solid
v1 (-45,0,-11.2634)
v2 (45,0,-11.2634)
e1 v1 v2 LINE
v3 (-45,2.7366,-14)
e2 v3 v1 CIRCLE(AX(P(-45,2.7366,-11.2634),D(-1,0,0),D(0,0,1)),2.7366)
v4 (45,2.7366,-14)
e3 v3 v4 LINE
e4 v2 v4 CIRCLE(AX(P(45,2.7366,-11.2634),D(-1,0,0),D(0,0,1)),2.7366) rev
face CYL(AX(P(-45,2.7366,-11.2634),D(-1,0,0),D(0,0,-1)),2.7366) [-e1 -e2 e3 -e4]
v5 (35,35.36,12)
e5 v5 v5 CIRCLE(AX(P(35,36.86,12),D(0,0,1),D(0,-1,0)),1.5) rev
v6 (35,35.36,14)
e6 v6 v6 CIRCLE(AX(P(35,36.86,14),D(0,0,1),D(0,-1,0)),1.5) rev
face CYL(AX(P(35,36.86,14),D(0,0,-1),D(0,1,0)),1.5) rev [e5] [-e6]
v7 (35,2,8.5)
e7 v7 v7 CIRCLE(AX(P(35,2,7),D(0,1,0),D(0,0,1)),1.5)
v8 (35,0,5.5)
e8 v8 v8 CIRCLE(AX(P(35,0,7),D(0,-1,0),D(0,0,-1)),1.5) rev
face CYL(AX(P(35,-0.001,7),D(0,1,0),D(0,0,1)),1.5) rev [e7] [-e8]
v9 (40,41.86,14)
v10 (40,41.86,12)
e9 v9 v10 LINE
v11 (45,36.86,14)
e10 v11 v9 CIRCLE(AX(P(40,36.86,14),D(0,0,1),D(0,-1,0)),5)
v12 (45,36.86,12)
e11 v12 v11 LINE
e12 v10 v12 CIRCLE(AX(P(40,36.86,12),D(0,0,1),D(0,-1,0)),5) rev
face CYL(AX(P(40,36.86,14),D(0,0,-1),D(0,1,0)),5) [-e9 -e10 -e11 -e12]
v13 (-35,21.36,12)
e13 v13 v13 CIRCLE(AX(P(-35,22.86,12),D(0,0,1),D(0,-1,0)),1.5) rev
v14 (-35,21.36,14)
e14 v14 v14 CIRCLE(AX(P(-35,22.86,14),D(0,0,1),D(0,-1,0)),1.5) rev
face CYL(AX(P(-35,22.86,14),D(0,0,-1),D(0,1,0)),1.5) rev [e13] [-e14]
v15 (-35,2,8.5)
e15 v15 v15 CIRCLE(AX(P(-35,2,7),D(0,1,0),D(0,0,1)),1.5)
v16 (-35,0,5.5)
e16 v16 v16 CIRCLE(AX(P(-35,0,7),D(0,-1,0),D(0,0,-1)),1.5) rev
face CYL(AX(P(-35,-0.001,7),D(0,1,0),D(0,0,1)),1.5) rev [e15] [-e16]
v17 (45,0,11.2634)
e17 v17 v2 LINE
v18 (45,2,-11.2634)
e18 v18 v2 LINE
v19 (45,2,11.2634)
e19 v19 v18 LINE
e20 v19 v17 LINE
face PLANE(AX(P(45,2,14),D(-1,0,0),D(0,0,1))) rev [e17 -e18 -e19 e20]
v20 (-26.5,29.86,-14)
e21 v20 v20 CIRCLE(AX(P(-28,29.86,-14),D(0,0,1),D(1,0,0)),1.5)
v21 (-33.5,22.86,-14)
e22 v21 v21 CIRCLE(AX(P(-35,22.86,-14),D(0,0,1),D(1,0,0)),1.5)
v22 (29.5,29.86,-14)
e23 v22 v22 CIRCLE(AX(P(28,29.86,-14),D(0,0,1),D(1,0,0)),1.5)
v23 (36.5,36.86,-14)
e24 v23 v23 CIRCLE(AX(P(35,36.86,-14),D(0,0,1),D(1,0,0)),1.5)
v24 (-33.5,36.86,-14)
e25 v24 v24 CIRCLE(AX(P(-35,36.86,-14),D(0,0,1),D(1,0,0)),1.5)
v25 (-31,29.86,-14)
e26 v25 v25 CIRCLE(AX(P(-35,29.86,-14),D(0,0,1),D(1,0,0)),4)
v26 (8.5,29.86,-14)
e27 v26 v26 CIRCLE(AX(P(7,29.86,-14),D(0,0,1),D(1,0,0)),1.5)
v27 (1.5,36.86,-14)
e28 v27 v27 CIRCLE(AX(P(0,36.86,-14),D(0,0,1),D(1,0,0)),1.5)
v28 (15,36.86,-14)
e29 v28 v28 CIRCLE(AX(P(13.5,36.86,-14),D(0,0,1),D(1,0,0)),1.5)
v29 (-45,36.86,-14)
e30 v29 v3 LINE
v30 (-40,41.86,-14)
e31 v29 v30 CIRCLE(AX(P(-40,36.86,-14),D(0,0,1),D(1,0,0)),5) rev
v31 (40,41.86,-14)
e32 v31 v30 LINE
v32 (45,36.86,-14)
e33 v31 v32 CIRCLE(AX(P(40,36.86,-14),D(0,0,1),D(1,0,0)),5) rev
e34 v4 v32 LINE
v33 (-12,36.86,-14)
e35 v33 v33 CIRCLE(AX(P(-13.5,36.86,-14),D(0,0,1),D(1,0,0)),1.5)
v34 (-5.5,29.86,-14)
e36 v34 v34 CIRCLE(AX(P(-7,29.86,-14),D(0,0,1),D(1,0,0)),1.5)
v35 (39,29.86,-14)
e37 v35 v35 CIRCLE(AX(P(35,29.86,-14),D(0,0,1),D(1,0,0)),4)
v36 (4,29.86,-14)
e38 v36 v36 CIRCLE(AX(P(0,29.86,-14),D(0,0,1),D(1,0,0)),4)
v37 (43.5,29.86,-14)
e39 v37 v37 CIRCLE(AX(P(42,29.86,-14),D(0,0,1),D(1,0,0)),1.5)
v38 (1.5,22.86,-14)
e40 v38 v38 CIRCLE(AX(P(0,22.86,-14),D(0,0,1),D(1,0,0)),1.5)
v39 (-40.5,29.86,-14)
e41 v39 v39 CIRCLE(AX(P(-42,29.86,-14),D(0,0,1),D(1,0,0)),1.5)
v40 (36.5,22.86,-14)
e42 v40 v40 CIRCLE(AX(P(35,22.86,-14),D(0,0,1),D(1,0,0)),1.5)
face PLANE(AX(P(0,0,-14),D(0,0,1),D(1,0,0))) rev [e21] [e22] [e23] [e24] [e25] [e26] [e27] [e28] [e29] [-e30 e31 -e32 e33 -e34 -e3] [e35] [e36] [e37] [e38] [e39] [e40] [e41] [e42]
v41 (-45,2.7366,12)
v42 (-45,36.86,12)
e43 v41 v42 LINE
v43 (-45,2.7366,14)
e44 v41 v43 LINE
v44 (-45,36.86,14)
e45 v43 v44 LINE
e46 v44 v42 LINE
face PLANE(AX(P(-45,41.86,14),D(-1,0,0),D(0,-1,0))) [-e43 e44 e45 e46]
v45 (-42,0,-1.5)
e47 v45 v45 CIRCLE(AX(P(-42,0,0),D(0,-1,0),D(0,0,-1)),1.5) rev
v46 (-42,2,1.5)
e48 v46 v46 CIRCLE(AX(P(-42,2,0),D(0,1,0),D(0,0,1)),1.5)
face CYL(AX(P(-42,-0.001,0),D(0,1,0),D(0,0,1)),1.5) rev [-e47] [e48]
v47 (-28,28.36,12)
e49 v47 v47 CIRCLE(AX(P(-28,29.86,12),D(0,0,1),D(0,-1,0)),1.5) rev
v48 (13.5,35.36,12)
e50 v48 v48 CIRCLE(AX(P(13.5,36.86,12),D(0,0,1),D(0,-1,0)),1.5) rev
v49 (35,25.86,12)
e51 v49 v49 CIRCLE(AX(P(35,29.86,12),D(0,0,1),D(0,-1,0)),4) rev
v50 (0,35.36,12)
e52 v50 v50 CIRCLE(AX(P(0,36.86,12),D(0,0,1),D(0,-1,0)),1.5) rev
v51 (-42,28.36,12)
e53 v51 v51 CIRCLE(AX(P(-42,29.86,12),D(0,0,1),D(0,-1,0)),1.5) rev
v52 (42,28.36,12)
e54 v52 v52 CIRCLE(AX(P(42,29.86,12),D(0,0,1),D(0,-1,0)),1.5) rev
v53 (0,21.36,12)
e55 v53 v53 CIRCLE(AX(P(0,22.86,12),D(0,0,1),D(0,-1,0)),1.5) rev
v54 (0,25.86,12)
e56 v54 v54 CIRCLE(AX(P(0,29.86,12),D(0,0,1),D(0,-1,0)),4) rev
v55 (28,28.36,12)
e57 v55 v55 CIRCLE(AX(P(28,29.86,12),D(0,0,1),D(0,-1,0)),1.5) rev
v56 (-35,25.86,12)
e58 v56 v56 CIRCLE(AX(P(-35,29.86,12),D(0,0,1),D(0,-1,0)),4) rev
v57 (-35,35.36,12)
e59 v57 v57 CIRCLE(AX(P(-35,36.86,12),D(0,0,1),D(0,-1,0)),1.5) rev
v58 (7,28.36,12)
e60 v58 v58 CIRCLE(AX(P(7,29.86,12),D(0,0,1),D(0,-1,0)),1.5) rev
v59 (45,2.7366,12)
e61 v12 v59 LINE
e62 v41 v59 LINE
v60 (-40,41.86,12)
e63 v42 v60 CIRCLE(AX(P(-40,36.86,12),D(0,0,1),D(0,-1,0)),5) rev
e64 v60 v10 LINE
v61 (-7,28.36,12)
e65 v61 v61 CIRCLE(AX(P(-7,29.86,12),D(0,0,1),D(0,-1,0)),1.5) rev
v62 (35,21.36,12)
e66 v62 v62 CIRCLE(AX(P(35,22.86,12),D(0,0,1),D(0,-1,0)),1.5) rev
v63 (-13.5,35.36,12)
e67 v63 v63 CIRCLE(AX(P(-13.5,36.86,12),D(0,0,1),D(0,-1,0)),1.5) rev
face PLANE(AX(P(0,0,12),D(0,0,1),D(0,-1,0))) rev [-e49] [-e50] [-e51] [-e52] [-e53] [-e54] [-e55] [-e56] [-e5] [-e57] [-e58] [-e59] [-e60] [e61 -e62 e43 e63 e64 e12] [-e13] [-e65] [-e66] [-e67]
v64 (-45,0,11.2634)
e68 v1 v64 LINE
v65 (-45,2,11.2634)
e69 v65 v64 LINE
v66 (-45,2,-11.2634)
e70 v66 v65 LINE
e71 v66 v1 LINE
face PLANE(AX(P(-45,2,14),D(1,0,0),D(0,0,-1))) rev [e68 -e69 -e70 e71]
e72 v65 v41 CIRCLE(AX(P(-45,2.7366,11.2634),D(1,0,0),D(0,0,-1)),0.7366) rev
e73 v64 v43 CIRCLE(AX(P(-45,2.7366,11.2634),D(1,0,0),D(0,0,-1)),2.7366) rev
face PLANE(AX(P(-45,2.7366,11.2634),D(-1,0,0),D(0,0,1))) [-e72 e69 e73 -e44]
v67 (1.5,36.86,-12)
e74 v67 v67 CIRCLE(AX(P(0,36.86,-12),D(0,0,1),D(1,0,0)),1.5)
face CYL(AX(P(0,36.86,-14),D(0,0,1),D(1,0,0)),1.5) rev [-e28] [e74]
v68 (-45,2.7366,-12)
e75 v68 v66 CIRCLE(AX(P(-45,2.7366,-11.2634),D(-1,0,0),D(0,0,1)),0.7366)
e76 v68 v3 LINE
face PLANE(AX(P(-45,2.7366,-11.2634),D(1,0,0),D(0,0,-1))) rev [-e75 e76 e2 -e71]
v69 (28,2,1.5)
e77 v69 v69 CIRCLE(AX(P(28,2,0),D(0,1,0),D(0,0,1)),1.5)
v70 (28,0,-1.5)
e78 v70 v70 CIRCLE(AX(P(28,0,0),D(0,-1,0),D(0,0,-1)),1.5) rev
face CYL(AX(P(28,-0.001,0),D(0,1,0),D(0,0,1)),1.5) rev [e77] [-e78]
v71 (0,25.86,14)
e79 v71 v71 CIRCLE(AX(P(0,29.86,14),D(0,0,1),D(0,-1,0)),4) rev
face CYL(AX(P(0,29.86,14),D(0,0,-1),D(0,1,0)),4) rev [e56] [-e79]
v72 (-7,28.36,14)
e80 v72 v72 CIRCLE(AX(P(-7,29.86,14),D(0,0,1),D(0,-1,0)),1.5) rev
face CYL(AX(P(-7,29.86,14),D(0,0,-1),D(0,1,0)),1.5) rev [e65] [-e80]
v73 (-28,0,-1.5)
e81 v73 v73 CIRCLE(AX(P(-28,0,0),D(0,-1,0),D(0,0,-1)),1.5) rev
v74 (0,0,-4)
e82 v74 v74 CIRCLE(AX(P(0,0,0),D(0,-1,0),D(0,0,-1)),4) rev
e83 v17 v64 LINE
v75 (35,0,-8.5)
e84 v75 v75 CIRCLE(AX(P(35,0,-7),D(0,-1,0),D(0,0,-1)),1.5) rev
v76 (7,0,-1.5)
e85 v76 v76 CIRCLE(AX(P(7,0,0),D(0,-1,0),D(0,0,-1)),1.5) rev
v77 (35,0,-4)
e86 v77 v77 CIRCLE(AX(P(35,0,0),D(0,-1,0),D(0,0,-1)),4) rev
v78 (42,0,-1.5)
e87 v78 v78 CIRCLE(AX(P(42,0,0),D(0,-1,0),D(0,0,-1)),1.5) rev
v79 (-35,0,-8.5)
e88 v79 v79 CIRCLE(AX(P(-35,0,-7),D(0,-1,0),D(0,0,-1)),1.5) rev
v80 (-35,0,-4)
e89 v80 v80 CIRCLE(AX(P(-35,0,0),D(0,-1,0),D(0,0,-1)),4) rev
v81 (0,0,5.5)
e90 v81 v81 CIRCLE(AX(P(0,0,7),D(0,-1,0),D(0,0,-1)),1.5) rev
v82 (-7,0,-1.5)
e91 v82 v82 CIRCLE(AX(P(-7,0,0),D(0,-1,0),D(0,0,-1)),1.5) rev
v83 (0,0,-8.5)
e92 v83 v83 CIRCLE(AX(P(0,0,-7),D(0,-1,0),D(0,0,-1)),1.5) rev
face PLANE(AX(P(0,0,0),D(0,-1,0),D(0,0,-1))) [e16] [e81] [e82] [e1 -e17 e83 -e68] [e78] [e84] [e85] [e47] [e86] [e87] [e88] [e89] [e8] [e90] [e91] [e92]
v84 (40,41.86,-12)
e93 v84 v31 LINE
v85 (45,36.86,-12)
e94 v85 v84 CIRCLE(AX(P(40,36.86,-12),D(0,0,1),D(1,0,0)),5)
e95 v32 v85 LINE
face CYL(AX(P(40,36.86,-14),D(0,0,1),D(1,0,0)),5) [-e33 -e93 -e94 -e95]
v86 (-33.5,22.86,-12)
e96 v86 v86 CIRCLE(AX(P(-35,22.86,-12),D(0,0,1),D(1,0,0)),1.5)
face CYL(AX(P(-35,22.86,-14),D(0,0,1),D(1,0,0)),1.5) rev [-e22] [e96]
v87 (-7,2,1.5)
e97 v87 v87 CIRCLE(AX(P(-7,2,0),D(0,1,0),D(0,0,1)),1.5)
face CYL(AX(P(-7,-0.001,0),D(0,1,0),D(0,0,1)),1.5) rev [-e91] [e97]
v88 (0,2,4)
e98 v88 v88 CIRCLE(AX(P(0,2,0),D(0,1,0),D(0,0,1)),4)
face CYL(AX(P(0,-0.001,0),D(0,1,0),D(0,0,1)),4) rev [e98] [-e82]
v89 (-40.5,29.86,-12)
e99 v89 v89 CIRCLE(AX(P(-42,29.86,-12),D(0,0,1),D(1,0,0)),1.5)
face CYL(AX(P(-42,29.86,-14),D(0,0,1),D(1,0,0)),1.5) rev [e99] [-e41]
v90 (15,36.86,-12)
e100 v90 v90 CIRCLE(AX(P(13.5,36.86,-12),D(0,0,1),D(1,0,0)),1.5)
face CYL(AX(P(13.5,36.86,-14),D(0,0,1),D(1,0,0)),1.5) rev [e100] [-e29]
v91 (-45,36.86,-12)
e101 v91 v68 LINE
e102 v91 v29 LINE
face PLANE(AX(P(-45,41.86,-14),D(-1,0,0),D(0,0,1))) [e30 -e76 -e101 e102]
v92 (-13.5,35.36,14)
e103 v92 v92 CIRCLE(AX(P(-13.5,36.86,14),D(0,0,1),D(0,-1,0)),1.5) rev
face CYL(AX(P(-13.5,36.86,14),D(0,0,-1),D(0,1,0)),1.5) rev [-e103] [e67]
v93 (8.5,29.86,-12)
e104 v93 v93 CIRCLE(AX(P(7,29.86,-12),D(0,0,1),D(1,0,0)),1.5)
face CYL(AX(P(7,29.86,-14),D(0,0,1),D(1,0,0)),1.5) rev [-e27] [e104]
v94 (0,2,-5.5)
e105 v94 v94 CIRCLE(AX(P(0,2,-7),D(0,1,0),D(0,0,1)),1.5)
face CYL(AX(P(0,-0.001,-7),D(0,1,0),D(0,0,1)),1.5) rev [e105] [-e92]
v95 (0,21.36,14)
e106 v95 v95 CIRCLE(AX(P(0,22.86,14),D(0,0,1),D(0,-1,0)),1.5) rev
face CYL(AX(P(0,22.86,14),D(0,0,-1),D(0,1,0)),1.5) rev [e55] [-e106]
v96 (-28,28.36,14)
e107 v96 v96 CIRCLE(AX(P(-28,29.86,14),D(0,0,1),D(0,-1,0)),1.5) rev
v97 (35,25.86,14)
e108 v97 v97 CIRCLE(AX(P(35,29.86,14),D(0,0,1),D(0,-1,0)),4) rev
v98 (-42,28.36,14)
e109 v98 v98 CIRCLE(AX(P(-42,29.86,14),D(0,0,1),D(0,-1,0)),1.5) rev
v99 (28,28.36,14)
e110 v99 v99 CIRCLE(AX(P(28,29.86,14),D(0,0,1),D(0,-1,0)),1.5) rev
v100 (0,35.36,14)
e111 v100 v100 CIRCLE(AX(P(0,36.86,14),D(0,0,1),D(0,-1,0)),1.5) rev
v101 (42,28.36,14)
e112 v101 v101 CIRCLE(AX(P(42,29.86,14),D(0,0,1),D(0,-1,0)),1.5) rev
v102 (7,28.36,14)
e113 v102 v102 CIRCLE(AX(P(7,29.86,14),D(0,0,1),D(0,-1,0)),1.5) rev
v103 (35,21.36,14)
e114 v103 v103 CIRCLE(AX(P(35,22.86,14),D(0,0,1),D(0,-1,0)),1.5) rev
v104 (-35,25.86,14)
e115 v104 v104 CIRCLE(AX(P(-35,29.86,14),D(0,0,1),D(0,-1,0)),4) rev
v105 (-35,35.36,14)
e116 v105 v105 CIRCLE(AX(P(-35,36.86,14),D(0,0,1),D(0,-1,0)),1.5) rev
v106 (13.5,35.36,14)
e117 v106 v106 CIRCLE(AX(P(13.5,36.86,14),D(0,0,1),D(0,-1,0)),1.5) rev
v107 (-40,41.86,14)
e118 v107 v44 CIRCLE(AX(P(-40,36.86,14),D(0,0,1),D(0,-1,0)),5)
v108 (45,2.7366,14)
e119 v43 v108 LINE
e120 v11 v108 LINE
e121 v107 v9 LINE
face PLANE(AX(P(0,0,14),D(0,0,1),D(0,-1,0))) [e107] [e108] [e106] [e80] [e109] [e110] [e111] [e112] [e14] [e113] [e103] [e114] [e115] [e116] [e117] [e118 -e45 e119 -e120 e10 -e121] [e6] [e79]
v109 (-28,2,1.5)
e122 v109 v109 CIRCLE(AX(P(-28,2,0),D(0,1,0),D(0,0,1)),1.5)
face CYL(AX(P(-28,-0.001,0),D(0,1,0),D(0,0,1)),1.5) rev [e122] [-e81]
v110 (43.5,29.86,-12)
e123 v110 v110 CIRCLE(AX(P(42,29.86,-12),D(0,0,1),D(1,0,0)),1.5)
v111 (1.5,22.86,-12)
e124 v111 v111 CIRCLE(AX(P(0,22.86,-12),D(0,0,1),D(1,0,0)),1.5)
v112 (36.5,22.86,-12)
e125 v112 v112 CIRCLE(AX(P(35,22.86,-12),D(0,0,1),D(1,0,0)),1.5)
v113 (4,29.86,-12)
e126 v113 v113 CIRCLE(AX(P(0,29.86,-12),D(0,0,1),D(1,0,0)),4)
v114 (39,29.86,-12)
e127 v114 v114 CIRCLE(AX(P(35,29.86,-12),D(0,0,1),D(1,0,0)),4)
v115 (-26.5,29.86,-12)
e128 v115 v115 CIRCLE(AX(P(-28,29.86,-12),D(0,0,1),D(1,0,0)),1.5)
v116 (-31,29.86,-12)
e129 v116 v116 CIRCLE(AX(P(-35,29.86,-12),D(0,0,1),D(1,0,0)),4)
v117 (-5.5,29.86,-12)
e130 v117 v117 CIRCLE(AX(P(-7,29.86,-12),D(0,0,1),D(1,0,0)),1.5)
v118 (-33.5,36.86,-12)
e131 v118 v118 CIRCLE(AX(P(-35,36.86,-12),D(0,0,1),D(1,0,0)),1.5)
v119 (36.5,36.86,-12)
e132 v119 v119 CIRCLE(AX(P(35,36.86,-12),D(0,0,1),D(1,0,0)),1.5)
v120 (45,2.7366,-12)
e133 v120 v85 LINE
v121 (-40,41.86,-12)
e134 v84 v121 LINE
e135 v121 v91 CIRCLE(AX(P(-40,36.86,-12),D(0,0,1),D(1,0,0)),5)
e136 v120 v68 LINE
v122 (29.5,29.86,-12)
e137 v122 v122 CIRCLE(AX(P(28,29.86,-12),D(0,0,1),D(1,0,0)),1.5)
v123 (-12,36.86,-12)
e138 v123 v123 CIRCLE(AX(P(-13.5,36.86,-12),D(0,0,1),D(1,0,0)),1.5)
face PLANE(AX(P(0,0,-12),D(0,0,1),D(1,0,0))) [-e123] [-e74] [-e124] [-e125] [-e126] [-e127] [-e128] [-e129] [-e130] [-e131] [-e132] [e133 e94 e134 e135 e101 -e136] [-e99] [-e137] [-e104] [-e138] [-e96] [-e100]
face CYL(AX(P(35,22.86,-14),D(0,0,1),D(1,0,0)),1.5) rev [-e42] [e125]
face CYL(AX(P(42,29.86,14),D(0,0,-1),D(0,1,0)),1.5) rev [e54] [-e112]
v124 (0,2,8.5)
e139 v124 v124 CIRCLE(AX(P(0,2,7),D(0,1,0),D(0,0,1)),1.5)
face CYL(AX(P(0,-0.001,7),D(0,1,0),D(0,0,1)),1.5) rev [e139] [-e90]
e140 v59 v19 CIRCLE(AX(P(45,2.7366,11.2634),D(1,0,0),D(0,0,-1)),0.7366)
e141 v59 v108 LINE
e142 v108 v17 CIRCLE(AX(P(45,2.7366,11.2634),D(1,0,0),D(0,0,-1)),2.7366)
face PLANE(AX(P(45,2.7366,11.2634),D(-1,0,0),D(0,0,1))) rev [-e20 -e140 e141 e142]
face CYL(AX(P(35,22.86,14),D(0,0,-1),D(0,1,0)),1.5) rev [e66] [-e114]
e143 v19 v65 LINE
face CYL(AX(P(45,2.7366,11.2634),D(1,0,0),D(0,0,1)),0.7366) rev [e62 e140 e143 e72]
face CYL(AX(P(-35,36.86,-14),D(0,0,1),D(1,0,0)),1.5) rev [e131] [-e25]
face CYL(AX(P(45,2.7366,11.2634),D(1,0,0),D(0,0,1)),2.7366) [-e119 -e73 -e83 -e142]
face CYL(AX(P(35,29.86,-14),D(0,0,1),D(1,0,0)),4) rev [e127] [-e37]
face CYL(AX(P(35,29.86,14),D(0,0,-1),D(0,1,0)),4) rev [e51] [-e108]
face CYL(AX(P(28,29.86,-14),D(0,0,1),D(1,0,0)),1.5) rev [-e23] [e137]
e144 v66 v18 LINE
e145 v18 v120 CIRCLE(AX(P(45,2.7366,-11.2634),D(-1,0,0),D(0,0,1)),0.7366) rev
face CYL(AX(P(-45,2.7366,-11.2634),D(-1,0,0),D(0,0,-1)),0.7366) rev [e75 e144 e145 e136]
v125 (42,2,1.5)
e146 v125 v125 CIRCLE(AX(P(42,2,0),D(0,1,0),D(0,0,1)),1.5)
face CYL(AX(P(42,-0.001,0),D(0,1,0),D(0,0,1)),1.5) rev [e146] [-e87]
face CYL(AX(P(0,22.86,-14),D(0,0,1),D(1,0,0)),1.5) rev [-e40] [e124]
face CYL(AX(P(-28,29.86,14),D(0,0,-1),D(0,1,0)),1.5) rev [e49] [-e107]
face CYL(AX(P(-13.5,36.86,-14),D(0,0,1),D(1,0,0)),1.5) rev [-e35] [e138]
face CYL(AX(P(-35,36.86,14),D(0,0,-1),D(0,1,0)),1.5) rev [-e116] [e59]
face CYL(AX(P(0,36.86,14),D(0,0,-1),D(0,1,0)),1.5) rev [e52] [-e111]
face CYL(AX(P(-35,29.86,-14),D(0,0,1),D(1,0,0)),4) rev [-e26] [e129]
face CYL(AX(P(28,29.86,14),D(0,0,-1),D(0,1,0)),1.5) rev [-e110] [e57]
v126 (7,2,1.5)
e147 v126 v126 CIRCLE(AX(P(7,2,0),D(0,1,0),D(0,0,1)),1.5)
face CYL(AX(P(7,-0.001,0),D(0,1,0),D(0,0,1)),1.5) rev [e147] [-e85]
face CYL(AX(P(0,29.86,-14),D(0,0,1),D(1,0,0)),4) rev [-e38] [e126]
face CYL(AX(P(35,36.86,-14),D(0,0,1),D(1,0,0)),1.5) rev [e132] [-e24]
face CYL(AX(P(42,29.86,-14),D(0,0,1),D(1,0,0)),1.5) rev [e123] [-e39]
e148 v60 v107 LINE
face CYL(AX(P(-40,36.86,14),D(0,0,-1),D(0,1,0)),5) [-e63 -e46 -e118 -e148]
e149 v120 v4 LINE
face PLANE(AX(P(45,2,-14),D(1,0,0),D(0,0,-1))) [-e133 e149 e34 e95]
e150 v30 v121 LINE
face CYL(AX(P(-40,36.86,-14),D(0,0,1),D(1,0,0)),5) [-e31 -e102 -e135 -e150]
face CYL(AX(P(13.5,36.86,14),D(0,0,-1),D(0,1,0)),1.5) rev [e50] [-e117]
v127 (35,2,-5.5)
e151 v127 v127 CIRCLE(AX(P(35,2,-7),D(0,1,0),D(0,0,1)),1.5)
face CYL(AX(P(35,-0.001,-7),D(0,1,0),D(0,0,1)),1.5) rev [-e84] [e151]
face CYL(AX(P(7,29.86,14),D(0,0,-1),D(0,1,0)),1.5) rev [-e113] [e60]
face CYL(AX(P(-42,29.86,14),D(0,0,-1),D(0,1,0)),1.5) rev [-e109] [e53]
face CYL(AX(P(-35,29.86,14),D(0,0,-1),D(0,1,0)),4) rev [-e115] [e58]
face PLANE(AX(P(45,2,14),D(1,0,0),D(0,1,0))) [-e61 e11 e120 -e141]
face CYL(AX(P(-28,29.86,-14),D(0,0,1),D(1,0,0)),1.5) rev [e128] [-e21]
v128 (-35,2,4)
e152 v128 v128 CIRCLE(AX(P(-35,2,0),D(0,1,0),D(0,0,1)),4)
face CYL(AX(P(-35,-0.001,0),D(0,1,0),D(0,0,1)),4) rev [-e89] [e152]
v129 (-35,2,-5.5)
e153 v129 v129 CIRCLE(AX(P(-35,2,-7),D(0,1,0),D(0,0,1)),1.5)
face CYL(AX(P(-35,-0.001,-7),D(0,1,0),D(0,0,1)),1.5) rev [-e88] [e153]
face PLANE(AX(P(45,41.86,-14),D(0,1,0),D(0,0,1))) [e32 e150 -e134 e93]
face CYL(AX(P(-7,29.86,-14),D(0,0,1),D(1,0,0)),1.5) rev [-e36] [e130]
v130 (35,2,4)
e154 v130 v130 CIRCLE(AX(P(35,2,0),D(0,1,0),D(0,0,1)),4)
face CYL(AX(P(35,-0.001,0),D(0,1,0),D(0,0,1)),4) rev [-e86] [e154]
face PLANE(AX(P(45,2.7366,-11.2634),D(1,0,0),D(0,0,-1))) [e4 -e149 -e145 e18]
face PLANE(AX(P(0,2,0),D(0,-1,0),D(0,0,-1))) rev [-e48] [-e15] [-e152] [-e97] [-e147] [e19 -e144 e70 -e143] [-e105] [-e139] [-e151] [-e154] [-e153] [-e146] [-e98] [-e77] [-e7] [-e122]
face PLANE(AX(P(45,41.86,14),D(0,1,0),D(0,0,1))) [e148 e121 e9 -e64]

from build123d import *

# Parameters (mm, degrees)
SCHIZZO1_W                       = 90
SCHIZZO1_H                       = 28
BASE_FLANGIA1_DEPTH              = 2
BORDO_FLANGIA1_STRIP_W           = 9.4732
BORDO_FLANGIA1_STRIP_H           = 2
BORDO_FLANGIA1_STRIP_CUT_DEPTH   = 90
BORDO_FLANGIA1_STRIP_2_W         = 9.4732
BORDO_FLANGIA1_STRIP_2_H         = 2
BORDO_FLANGIA1_STRIP_CUT_2_DEPTH = 90
BORDO_FLANGIA1_DEPTH             = 90
BORDO_FLANGIA1_PROFILE_W         = 90
BORDO_FLANGIA1_PROFILE_H         = 39.1234
BORDO_FLANGIA1_PROFILE_R         = 1.5
BORDO_FLANGIA1_PROFILE_R_2       = 4
BORDO_FLANGIA1_FLAT_DEPTH        = 2
BORDO_FLANGIA1_BEND_DEPTH        = 90
BORDO_FLANGIA1_PROFILE_2_W       = 90
BORDO_FLANGIA1_PROFILE_2_H       = 39.1234
BORDO_FLANGIA1_PROFILE_2_R       = 1.5
BORDO_FLANGIA1_PROFILE_2_R_2     = 4
BORDO_FLANGIA1_FLAT_2_DEPTH      = 2
RACCORDO1_R                      = 5
CUT_EXTRUDE1_REACH               = 63.724
SCHIZZO4_R                       = 4
SCHIZZO4_R_2                     = 1.5


# Sheet-metal steps are written as plain solids
with BuildPart() as part:
    # Schizzo1 → Base-Flangia1 (new body)
    with BuildSketch(Plane(origin=(0, 0, 0), x_dir=(1, 0, 0), z_dir=(0, 1, 0))):
        Rectangle(SCHIZZO1_W, SCHIZZO1_H)
    extrude(amount=BASE_FLANGIA1_DEPTH)

    # Bordo-Flangia1 strip (across the edge) → Bordo-Flangia1 strip cut (cut)
    with BuildSketch(Plane(origin=(-45, 2, 14), x_dir=(0, 0, -1), z_dir=(1, 0, 0))):
        with Locations((-2, -1)):
            Rectangle(BORDO_FLANGIA1_STRIP_W, BORDO_FLANGIA1_STRIP_H)
    extrude(amount=BORDO_FLANGIA1_STRIP_CUT_DEPTH, mode=Mode.SUBTRACT)

    # Bordo-Flangia1 strip 2 (across the edge) → Bordo-Flangia1 strip cut 2 (cut)
    with BuildSketch(Plane(origin=(45, 2, -14), x_dir=(0, 0, 1), z_dir=(-1, 0, 0))):
        with Locations((-2, -1)):
            Rectangle(BORDO_FLANGIA1_STRIP_2_W, BORDO_FLANGIA1_STRIP_2_H)
    extrude(amount=BORDO_FLANGIA1_STRIP_CUT_2_DEPTH, mode=Mode.SUBTRACT)

    # Bordo-Flangia1 bend section (across the edge) → Bordo-Flangia1 (add)
    with BuildSketch(Plane(origin=(-45, 2, 14), x_dir=(0, 0, -1), z_dir=(1, 0, 0))):
        with BuildLine():
            Line((0, 0.7366), (2, 0.7366))
            ThreePointArc((2, 0.7366), (2.215745145, 0.215745145), (2.7366, 0))
            Line((2.7366, 0), (2.7366, -2))
            ThreePointArc((2.7366, -2), (0.801531583, -1.198468417), (0, 0.7366))
        make_face()
    extrude(amount=BORDO_FLANGIA1_DEPTH)

    # Bordo-Flangia1 profile (on flange) → Bordo-Flangia1 flat (add)
    with BuildSketch(Plane(origin=(0, 2, 14), x_dir=(-1, 0, 0), z_dir=(0, 0, -1))):
        with Locations((0, 20.2983)):
            Rectangle(BORDO_FLANGIA1_PROFILE_W, BORDO_FLANGIA1_PROFILE_H)
        with Locations((35, 20.86)):
            Circle(BORDO_FLANGIA1_PROFILE_R, mode=Mode.SUBTRACT)
        with Locations((0, 20.86)):
            Circle(BORDO_FLANGIA1_PROFILE_R, mode=Mode.SUBTRACT)
        with Locations((-35, 20.86)):
            Circle(BORDO_FLANGIA1_PROFILE_R, mode=Mode.SUBTRACT)
        with Locations((42, 27.86)):
            Circle(BORDO_FLANGIA1_PROFILE_R, mode=Mode.SUBTRACT)
        with Locations((35, 27.86)):
            Circle(BORDO_FLANGIA1_PROFILE_R_2, mode=Mode.SUBTRACT)
        with Locations((28, 27.86)):
            Circle(BORDO_FLANGIA1_PROFILE_R, mode=Mode.SUBTRACT)
        with Locations((7, 27.86)):
            Circle(BORDO_FLANGIA1_PROFILE_R, mode=Mode.SUBTRACT)
        with Locations((35, 34.86)):
            Circle(BORDO_FLANGIA1_PROFILE_R, mode=Mode.SUBTRACT)
        with Locations((13.5, 34.86)):
            Circle(BORDO_FLANGIA1_PROFILE_R, mode=Mode.SUBTRACT)
        with Locations((0, 27.86)):
            Circle(BORDO_FLANGIA1_PROFILE_R_2, mode=Mode.SUBTRACT)
        with Locations((-7, 27.86)):
            Circle(BORDO_FLANGIA1_PROFILE_R, mode=Mode.SUBTRACT)
        with Locations((-28, 27.86)):
            Circle(BORDO_FLANGIA1_PROFILE_R, mode=Mode.SUBTRACT)
        with Locations((-35, 27.86)):
            Circle(BORDO_FLANGIA1_PROFILE_R_2, mode=Mode.SUBTRACT)
        with Locations((-42, 27.86)):
            Circle(BORDO_FLANGIA1_PROFILE_R, mode=Mode.SUBTRACT)
        with Locations((0, 34.86)):
            Circle(BORDO_FLANGIA1_PROFILE_R, mode=Mode.SUBTRACT)
        with Locations((-13.5, 34.86)):
            Circle(BORDO_FLANGIA1_PROFILE_R, mode=Mode.SUBTRACT)
        with Locations((-35, 34.86)):
            Circle(BORDO_FLANGIA1_PROFILE_R, mode=Mode.SUBTRACT)
    extrude(amount=BORDO_FLANGIA1_FLAT_DEPTH)

    # Bordo-Flangia1 bend section 2 (across the edge) → Bordo-Flangia1 bend (add)
    with BuildSketch(Plane(origin=(45, 2, -14), x_dir=(0, 0, 1), z_dir=(-1, 0, 0))):
        with BuildLine():
            Line((0, 0.7366), (2, 0.7366))
            ThreePointArc((2, 0.7366), (2.215745145, 0.215745145), (2.7366, 0))
            Line((2.7366, 0), (2.7366, -2))
            ThreePointArc((2.7366, -2), (0.801531583, -1.198468417), (0, 0.7366))
        make_face()
    extrude(amount=BORDO_FLANGIA1_BEND_DEPTH)

    # Bordo-Flangia1 profile 2 (on flange) → Bordo-Flangia1 flat 2 (add)
    with BuildSketch(Plane(origin=(0, 2, -14), x_dir=(1, 0, 0), z_dir=(0, 0, 1))):
        with Locations((0, 20.2983)):
            Rectangle(BORDO_FLANGIA1_PROFILE_2_W, BORDO_FLANGIA1_PROFILE_2_H)
        with Locations((35, 20.86)):
            Circle(BORDO_FLANGIA1_PROFILE_2_R, mode=Mode.SUBTRACT)
        with Locations((0, 20.86)):
            Circle(BORDO_FLANGIA1_PROFILE_2_R, mode=Mode.SUBTRACT)
        with Locations((-35, 20.86)):
            Circle(BORDO_FLANGIA1_PROFILE_2_R, mode=Mode.SUBTRACT)
        with Locations((42, 27.86)):
            Circle(BORDO_FLANGIA1_PROFILE_2_R, mode=Mode.SUBTRACT)
        with Locations((35, 27.86)):
            Circle(BORDO_FLANGIA1_PROFILE_2_R_2, mode=Mode.SUBTRACT)
        with Locations((28, 27.86)):
            Circle(BORDO_FLANGIA1_PROFILE_2_R, mode=Mode.SUBTRACT)
        with Locations((7, 27.86)):
            Circle(BORDO_FLANGIA1_PROFILE_2_R, mode=Mode.SUBTRACT)
        with Locations((35, 34.86)):
            Circle(BORDO_FLANGIA1_PROFILE_2_R, mode=Mode.SUBTRACT)
        with Locations((13.5, 34.86)):
            Circle(BORDO_FLANGIA1_PROFILE_2_R, mode=Mode.SUBTRACT)
        with Locations((0, 27.86)):
            Circle(BORDO_FLANGIA1_PROFILE_2_R_2, mode=Mode.SUBTRACT)
        with Locations((-7, 27.86)):
            Circle(BORDO_FLANGIA1_PROFILE_2_R, mode=Mode.SUBTRACT)
        with Locations((-28, 27.86)):
            Circle(BORDO_FLANGIA1_PROFILE_2_R, mode=Mode.SUBTRACT)
        with Locations((-35, 27.86)):
            Circle(BORDO_FLANGIA1_PROFILE_2_R_2, mode=Mode.SUBTRACT)
        with Locations((-42, 27.86)):
            Circle(BORDO_FLANGIA1_PROFILE_2_R, mode=Mode.SUBTRACT)
        with Locations((0, 34.86)):
            Circle(BORDO_FLANGIA1_PROFILE_2_R, mode=Mode.SUBTRACT)
        with Locations((-13.5, 34.86)):
            Circle(BORDO_FLANGIA1_PROFILE_2_R, mode=Mode.SUBTRACT)
        with Locations((-35, 34.86)):
            Circle(BORDO_FLANGIA1_PROFILE_2_R, mode=Mode.SUBTRACT)
    extrude(amount=BORDO_FLANGIA1_FLAT_2_DEPTH)

    # Raccordo1
    raccordo1_edges = [part.edges().sort_by_distance(p)[0] for p in [
        (-45, 41.86, -13),
        (-45, 41.86, 13),
        (45, 41.86, 13),
        (45, 41.86, -13),
    ]]
    fillet(raccordo1_edges, radius=RACCORDO1_R)

    # Schizzo4 → Cut-Extrude1 (cut, up to next)
    with BuildSketch(Plane(origin=(0, 2, 0), x_dir=(1, 0, 0), z_dir=(0, 1, 0)), mode=Mode.PRIVATE) as cut_extrude1_sk1:
        with Locations(Location((-35, 0, 0), (0, 0, 270))):
            Circle(SCHIZZO4_R)
    cut_extrude1_tool1 = extrude(cut_extrude1_sk1.sketch, amount=-CUT_EXTRUDE1_REACH, mode=Mode.PRIVATE) & part.part
    # Schizzo4 → Cut-Extrude1 (cut, up to next)
    with BuildSketch(Plane(origin=(0, 2, 0), x_dir=(1, 0, 0), z_dir=(0, 1, 0)), mode=Mode.PRIVATE) as cut_extrude1_sk2:
        with Locations(Location((0, 0, 0), (0, 0, 270))):
            Circle(SCHIZZO4_R)
    cut_extrude1_tool2 = extrude(cut_extrude1_sk2.sketch, amount=-CUT_EXTRUDE1_REACH, mode=Mode.PRIVATE) & part.part
    # Schizzo4 → Cut-Extrude1 (cut, up to next)
    with BuildSketch(Plane(origin=(0, 2, 0), x_dir=(1, 0, 0), z_dir=(0, 1, 0)), mode=Mode.PRIVATE) as cut_extrude1_sk3:
        with Locations(Location((35, 0, 0), (0, 0, 270))):
            Circle(SCHIZZO4_R)
    cut_extrude1_tool3 = extrude(cut_extrude1_sk3.sketch, amount=-CUT_EXTRUDE1_REACH, mode=Mode.PRIVATE) & part.part
    # Schizzo4 → Cut-Extrude1 (cut, up to next)
    with BuildSketch(Plane(origin=(0, 2, 0), x_dir=(1, 0, 0), z_dir=(0, 1, 0)), mode=Mode.PRIVATE) as cut_extrude1_sk4:
        with Locations(Location((-35, 7, 0), (0, 0, 270))):
            Circle(SCHIZZO4_R_2)
    cut_extrude1_tool4 = extrude(cut_extrude1_sk4.sketch, amount=-CUT_EXTRUDE1_REACH, mode=Mode.PRIVATE) & part.part
    # Schizzo4 → Cut-Extrude1 (cut, up to next)
    with BuildSketch(Plane(origin=(0, 2, 0), x_dir=(1, 0, 0), z_dir=(0, 1, 0)), mode=Mode.PRIVATE) as cut_extrude1_sk5:
        with Locations(Location((-28, 0, 0), (0, 0, 270))):
            Circle(SCHIZZO4_R_2)
    cut_extrude1_tool5 = extrude(cut_extrude1_sk5.sketch, amount=-CUT_EXTRUDE1_REACH, mode=Mode.PRIVATE) & part.part
    # Schizzo4 → Cut-Extrude1 (cut, up to next)
    with BuildSketch(Plane(origin=(0, 2, 0), x_dir=(1, 0, 0), z_dir=(0, 1, 0)), mode=Mode.PRIVATE) as cut_extrude1_sk6:
        with Locations(Location((-35, -7, 0), (0, 0, 270))):
            Circle(SCHIZZO4_R_2)
    cut_extrude1_tool6 = extrude(cut_extrude1_sk6.sketch, amount=-CUT_EXTRUDE1_REACH, mode=Mode.PRIVATE) & part.part
    # Schizzo4 → Cut-Extrude1 (cut, up to next)
    with BuildSketch(Plane(origin=(0, 2, 0), x_dir=(1, 0, 0), z_dir=(0, 1, 0)), mode=Mode.PRIVATE) as cut_extrude1_sk7:
        with Locations(Location((-42, 0, 0), (0, 0, 270))):
            Circle(SCHIZZO4_R_2)
    cut_extrude1_tool7 = extrude(cut_extrude1_sk7.sketch, amount=-CUT_EXTRUDE1_REACH, mode=Mode.PRIVATE) & part.part
    # Schizzo4 → Cut-Extrude1 (cut, up to next)
    with BuildSketch(Plane(origin=(0, 2, 0), x_dir=(1, 0, 0), z_dir=(0, 1, 0)), mode=Mode.PRIVATE) as cut_extrude1_sk8:
        with Locations(Location((-7, 0, 0), (0, 0, 270))):
            Circle(SCHIZZO4_R_2)
    cut_extrude1_tool8 = extrude(cut_extrude1_sk8.sketch, amount=-CUT_EXTRUDE1_REACH, mode=Mode.PRIVATE) & part.part
    # Schizzo4 → Cut-Extrude1 (cut, up to next)
    with BuildSketch(Plane(origin=(0, 2, 0), x_dir=(1, 0, 0), z_dir=(0, 1, 0)), mode=Mode.PRIVATE) as cut_extrude1_sk9:
        with Locations(Location((0, 7, 0), (0, 0, 270))):
            Circle(SCHIZZO4_R_2)
    cut_extrude1_tool9 = extrude(cut_extrude1_sk9.sketch, amount=-CUT_EXTRUDE1_REACH, mode=Mode.PRIVATE) & part.part
    # Schizzo4 → Cut-Extrude1 (cut, up to next)
    with BuildSketch(Plane(origin=(0, 2, 0), x_dir=(1, 0, 0), z_dir=(0, 1, 0)), mode=Mode.PRIVATE) as cut_extrude1_sk10:
        with Locations(Location((7, 0, 0), (0, 0, 270))):
            Circle(SCHIZZO4_R_2)
    cut_extrude1_tool10 = extrude(cut_extrude1_sk10.sketch, amount=-CUT_EXTRUDE1_REACH, mode=Mode.PRIVATE) & part.part
    # Schizzo4 → Cut-Extrude1 (cut, up to next)
    with BuildSketch(Plane(origin=(0, 2, 0), x_dir=(1, 0, 0), z_dir=(0, 1, 0)), mode=Mode.PRIVATE) as cut_extrude1_sk11:
        with Locations(Location((0, -7, 0), (0, 0, 270))):
            Circle(SCHIZZO4_R_2)
    cut_extrude1_tool11 = extrude(cut_extrude1_sk11.sketch, amount=-CUT_EXTRUDE1_REACH, mode=Mode.PRIVATE) & part.part
    # Schizzo4 → Cut-Extrude1 (cut, up to next)
    with BuildSketch(Plane(origin=(0, 2, 0), x_dir=(1, 0, 0), z_dir=(0, 1, 0)), mode=Mode.PRIVATE) as cut_extrude1_sk12:
        with Locations(Location((35, -7, 0), (0, 0, 270))):
            Circle(SCHIZZO4_R_2)
    cut_extrude1_tool12 = extrude(cut_extrude1_sk12.sketch, amount=-CUT_EXTRUDE1_REACH, mode=Mode.PRIVATE) & part.part
    # Schizzo4 → Cut-Extrude1 (cut, up to next)
    with BuildSketch(Plane(origin=(0, 2, 0), x_dir=(1, 0, 0), z_dir=(0, 1, 0)), mode=Mode.PRIVATE) as cut_extrude1_sk13:
        with Locations(Location((28, 0, 0), (0, 0, 270))):
            Circle(SCHIZZO4_R_2)
    cut_extrude1_tool13 = extrude(cut_extrude1_sk13.sketch, amount=-CUT_EXTRUDE1_REACH, mode=Mode.PRIVATE) & part.part
    # Schizzo4 → Cut-Extrude1 (cut, up to next)
    with BuildSketch(Plane(origin=(0, 2, 0), x_dir=(1, 0, 0), z_dir=(0, 1, 0)), mode=Mode.PRIVATE) as cut_extrude1_sk14:
        with Locations(Location((35, 7, 0), (0, 0, 270))):
            Circle(SCHIZZO4_R_2)
    cut_extrude1_tool14 = extrude(cut_extrude1_sk14.sketch, amount=-CUT_EXTRUDE1_REACH, mode=Mode.PRIVATE) & part.part
    # Schizzo4 → Cut-Extrude1 (cut, up to next)
    with BuildSketch(Plane(origin=(0, 2, 0), x_dir=(1, 0, 0), z_dir=(0, 1, 0)), mode=Mode.PRIVATE) as cut_extrude1_sk15:
        with Locations(Location((42, 0, 0), (0, 0, 270))):
            Circle(SCHIZZO4_R_2)
    cut_extrude1_tool15 = extrude(cut_extrude1_sk15.sketch, amount=-CUT_EXTRUDE1_REACH, mode=Mode.PRIVATE) & part.part
    add(cut_extrude1_tool1.solids().sort_by_distance((-35, 2, 0))[0], mode=Mode.SUBTRACT)
    add(cut_extrude1_tool2.solids().sort_by_distance((0, 2, 0))[0], mode=Mode.SUBTRACT)
    add(cut_extrude1_tool3.solids().sort_by_distance((35, 2, 0))[0], mode=Mode.SUBTRACT)
    add(cut_extrude1_tool4.solids().sort_by_distance((-35, 2, -7))[0], mode=Mode.SUBTRACT)
    add(cut_extrude1_tool5.solids().sort_by_distance((-28, 2, 0))[0], mode=Mode.SUBTRACT)
    add(cut_extrude1_tool6.solids().sort_by_distance((-35, 2, 7))[0], mode=Mode.SUBTRACT)
    add(cut_extrude1_tool7.solids().sort_by_distance((-42, 2, 0))[0], mode=Mode.SUBTRACT)
    add(cut_extrude1_tool8.solids().sort_by_distance((-7, 2, 0))[0], mode=Mode.SUBTRACT)
    add(cut_extrude1_tool9.solids().sort_by_distance((0, 2, -7))[0], mode=Mode.SUBTRACT)
    add(cut_extrude1_tool10.solids().sort_by_distance((7, 2, 0))[0], mode=Mode.SUBTRACT)
    add(cut_extrude1_tool11.solids().sort_by_distance((0, 2, 7))[0], mode=Mode.SUBTRACT)
    add(cut_extrude1_tool12.solids().sort_by_distance((35, 2, 7))[0], mode=Mode.SUBTRACT)
    add(cut_extrude1_tool13.solids().sort_by_distance((28, 2, 0))[0], mode=Mode.SUBTRACT)
    add(cut_extrude1_tool14.solids().sort_by_distance((35, 2, -7))[0], mode=Mode.SUBTRACT)
    add(cut_extrude1_tool15.solids().sort_by_distance((42, 2, 0))[0], mode=Mode.SUBTRACT)


solid = part.part
